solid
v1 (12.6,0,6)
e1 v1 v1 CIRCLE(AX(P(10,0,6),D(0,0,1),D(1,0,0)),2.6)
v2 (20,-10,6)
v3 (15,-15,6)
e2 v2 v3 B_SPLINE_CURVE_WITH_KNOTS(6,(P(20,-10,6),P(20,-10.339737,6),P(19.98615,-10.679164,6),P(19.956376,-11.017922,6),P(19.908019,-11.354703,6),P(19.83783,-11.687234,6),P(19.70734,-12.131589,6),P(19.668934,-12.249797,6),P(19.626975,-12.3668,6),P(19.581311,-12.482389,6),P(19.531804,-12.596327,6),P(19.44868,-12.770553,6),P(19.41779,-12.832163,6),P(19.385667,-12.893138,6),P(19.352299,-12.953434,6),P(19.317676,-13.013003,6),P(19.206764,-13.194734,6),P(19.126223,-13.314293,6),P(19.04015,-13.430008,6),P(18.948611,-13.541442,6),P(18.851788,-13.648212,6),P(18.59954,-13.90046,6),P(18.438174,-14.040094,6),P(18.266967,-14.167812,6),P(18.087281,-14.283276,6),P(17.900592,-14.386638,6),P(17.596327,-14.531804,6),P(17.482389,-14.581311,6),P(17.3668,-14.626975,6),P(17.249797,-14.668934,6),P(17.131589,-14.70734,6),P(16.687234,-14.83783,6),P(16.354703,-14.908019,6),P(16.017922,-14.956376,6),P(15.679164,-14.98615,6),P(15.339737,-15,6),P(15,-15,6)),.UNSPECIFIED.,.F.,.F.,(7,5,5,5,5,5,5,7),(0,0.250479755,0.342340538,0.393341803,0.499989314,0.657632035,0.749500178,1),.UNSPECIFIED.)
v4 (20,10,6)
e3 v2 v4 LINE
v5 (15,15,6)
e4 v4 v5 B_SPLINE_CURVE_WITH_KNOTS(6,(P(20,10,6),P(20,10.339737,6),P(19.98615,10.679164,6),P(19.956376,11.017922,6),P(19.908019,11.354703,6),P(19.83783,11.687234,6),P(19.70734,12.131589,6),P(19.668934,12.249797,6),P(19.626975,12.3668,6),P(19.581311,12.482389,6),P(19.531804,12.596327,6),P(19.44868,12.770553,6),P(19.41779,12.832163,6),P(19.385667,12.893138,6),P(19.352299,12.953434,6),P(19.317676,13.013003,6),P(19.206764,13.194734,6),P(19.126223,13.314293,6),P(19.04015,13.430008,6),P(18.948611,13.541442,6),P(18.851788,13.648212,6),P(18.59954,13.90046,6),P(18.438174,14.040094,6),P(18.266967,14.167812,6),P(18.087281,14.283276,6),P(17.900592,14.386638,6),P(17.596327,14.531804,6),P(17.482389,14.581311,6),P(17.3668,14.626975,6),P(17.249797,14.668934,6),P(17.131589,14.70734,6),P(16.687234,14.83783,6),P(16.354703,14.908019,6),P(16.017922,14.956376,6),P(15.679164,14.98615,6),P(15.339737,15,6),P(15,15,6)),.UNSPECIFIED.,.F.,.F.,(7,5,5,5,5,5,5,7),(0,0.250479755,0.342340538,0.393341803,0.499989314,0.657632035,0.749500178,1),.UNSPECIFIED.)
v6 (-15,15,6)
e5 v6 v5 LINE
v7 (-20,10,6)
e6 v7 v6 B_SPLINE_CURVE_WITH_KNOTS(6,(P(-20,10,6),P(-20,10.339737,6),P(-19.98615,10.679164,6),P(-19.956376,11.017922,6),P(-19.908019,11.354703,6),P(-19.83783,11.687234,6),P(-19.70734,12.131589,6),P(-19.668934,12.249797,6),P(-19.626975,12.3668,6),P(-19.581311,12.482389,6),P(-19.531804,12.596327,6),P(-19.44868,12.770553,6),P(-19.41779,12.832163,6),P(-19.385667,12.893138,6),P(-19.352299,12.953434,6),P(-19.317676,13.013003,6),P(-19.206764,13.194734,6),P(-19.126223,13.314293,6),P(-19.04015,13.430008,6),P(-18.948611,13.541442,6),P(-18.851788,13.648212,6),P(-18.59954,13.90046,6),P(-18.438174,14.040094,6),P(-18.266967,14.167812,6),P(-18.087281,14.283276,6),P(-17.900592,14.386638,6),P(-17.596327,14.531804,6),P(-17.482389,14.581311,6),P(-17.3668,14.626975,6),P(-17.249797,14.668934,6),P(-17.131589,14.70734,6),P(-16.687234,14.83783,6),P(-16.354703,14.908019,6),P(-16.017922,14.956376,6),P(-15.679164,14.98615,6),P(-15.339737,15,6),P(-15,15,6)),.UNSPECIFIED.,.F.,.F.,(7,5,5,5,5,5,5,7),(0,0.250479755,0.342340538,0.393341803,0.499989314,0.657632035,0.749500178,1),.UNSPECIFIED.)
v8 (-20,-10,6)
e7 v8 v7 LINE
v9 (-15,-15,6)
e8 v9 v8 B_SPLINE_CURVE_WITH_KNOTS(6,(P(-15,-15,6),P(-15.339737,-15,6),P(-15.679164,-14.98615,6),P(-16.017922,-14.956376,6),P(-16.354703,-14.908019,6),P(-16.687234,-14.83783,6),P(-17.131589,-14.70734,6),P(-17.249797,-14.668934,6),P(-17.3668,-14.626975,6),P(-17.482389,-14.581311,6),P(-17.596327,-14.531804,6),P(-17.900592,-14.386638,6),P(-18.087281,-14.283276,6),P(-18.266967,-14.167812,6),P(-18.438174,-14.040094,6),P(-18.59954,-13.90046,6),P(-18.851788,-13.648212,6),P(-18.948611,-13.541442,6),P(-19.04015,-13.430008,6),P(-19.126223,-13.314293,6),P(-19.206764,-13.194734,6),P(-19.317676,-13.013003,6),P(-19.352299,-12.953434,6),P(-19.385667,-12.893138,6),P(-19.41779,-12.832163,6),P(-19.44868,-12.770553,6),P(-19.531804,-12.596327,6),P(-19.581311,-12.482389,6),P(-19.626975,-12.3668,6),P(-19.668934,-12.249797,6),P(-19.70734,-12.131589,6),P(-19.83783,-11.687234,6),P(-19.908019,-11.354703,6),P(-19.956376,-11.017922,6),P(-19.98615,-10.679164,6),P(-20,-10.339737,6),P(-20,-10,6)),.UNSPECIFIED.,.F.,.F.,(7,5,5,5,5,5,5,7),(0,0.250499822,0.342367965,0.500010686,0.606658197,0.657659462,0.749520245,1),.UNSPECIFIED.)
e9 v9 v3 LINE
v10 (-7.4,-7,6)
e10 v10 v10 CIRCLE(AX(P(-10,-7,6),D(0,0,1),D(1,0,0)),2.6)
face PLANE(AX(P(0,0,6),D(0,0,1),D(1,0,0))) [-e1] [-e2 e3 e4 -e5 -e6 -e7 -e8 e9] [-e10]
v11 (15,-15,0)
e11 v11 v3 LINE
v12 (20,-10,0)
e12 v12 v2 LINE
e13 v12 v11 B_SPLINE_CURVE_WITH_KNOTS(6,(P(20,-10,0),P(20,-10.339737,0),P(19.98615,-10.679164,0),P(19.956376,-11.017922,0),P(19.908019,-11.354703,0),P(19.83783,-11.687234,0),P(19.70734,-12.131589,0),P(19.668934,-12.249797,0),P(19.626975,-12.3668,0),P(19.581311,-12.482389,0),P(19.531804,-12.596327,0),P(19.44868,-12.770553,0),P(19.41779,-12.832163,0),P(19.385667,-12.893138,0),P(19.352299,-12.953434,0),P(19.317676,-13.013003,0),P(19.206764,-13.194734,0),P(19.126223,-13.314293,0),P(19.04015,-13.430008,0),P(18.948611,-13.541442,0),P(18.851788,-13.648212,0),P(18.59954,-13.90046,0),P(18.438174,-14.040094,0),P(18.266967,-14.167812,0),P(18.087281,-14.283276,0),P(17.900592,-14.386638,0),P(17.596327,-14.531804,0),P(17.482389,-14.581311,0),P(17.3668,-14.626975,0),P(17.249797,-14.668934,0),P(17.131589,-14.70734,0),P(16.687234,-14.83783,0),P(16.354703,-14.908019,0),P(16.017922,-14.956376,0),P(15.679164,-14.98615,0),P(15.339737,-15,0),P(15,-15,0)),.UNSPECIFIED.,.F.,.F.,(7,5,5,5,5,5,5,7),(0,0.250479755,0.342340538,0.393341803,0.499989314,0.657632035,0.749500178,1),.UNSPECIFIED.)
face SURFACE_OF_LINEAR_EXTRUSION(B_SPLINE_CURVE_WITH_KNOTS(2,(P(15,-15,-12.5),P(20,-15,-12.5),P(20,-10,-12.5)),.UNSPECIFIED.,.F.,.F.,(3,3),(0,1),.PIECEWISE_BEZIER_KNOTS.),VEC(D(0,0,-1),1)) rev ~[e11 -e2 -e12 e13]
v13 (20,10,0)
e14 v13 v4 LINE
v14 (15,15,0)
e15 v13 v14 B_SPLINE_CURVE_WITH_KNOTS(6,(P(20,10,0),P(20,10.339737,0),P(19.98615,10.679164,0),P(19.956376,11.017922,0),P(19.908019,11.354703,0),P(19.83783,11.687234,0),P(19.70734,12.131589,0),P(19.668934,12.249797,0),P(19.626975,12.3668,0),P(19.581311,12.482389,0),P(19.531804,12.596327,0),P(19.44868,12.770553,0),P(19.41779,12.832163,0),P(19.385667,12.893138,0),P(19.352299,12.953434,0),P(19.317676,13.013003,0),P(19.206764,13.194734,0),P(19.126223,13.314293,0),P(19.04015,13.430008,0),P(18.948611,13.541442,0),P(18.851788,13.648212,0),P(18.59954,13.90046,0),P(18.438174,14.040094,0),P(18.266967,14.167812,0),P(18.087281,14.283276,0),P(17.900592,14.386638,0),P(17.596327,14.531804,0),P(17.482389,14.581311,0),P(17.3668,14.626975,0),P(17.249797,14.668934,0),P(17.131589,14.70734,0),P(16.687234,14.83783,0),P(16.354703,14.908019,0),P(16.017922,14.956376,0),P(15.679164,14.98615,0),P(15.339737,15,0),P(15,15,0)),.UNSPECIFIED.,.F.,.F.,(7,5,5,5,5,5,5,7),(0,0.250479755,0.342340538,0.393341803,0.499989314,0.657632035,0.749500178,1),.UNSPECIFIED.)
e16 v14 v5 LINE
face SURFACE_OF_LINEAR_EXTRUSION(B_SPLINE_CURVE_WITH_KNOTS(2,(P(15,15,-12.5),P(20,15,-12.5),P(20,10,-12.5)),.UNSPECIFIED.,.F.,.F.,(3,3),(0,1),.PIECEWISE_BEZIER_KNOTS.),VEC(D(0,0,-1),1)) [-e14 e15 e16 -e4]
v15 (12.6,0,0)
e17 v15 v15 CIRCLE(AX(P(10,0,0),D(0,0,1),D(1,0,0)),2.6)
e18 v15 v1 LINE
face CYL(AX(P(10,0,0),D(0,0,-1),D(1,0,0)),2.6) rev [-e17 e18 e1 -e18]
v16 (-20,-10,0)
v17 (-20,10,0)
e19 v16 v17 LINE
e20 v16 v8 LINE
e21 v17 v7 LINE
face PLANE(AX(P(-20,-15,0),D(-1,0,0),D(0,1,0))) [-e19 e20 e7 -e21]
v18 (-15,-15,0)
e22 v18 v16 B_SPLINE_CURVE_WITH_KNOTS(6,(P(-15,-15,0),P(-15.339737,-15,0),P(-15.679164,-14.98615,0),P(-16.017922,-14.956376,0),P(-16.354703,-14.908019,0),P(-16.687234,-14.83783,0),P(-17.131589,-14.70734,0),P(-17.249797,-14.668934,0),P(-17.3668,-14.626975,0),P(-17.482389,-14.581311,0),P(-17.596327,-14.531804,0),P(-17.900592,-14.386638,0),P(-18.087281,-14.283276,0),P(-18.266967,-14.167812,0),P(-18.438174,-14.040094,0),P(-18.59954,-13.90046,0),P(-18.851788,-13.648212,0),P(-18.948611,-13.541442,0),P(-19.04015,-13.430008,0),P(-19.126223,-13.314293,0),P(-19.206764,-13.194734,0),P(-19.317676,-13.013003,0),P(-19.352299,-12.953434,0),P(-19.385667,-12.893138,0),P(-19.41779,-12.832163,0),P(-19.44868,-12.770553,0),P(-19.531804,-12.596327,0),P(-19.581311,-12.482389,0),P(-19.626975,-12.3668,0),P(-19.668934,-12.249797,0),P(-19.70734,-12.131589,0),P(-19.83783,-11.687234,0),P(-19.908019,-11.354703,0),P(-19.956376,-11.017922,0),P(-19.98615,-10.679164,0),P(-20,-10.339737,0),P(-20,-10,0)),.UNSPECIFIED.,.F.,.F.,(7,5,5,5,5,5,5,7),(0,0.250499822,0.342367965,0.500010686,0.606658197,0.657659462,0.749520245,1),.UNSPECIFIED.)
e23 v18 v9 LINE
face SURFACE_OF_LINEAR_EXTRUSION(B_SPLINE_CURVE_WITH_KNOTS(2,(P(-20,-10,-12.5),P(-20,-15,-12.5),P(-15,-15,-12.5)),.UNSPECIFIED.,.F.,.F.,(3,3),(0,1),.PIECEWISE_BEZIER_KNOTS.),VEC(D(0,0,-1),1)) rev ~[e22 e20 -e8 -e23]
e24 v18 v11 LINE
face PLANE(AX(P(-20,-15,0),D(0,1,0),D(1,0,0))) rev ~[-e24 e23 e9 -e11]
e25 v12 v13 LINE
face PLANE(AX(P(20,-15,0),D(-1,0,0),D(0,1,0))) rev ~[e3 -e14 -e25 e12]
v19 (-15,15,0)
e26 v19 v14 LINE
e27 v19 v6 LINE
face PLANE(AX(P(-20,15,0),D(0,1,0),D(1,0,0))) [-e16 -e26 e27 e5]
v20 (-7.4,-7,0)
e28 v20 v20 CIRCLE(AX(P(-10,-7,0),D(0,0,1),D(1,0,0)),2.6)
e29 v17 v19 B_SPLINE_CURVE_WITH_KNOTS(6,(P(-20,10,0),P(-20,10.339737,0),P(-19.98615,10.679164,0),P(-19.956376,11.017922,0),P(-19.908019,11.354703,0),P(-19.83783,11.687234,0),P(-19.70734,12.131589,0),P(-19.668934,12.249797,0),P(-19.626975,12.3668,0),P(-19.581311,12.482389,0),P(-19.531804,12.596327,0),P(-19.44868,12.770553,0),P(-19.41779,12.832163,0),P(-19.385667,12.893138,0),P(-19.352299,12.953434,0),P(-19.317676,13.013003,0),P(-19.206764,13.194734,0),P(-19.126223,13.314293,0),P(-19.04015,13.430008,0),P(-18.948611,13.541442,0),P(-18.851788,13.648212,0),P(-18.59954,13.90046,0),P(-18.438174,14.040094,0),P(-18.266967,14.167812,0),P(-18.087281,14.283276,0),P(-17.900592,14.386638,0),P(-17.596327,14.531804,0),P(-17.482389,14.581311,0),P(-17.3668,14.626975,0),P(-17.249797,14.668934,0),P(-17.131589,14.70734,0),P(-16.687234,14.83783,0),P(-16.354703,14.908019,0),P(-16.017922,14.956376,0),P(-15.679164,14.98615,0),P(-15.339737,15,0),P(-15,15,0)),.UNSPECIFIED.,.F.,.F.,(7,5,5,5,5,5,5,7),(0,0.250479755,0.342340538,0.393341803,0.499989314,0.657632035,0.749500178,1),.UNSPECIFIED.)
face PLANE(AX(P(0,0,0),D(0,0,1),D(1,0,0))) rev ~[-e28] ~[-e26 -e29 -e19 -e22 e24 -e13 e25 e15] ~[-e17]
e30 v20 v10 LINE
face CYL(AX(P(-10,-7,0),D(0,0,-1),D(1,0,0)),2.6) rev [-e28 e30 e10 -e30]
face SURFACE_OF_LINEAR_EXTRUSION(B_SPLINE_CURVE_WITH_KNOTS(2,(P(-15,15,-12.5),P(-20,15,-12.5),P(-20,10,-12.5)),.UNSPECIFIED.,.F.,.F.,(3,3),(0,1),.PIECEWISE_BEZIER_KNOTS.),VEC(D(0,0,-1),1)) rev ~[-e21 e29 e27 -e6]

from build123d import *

# Parameters (mm, degrees)
F0_W        = 40
F0_H        = 30
F0_R        = 2.6
F1_DEPTH    = 6
F2_T1_DEPTH = 31


# Not quite as in the source:
# - a fillet or chamfer that OpenCascade refuses, or shapes differently, is made with other operations: its cross-section is extruded or revolved along the edge and cut away or added


with BuildPart() as f1:
    # F0 (on Top) → F1 (new body)
    with BuildSketch(Plane.XY):
        Rectangle(F0_W, F0_H)
        with Locations((-10, -7)):
            Circle(F0_R, mode=Mode.SUBTRACT)
        with Locations((10, 0)):
            Circle(F0_R, mode=Mode.SUBTRACT)
    extrude(amount=F1_DEPTH)

    # F2: fillet of radius 5 on 4 edges, made by hand

    # F2_s2 → F2_t1 (cut)
    with BuildSketch(Plane.XY.offset(-12.5)):
        with BuildLine():
            add(Edge.make_bspline(
                [(-20, -10), (-20, -15), (-15, -15)],
                knots=[0, 0, 0, 1, 1, 1], degree=2, weights=[1, 1, 1]))
            Line((-15, -15), (-20, -15))
            Line((-20, -15), (-20, -10))
        make_face()
        with BuildLine():
            add(Edge.make_bspline(
                [(15, -15), (20, -15), (20, -10)],
                knots=[0, 0, 0, 1, 1, 1], degree=2, weights=[1, 1, 1]))
            Line((20, -10), (20, -15))
            Line((20, -15), (15, -15))
        make_face()
        with BuildLine():
            add(Edge.make_bspline(
                [(15, 15), (20, 15), (20, 10)],
                knots=[0, 0, 0, 1, 1, 1], degree=2, weights=[1, 1, 1]))
            Line((20, 10), (20, 15))
            Line((20, 15), (15, 15))
        make_face()
        with BuildLine():
            add(Edge.make_bspline(
                [(-15, 15), (-20, 15), (-20, 10)],
                knots=[0, 0, 0, 1, 1, 1], degree=2, weights=[1, 1, 1]))
            Line((-20, 10), (-20, 15))
            Line((-20, 15), (-15, 15))
        make_face()
    extrude(amount=F2_T1_DEPTH, mode=Mode.SUBTRACT)


solid = f1.part
